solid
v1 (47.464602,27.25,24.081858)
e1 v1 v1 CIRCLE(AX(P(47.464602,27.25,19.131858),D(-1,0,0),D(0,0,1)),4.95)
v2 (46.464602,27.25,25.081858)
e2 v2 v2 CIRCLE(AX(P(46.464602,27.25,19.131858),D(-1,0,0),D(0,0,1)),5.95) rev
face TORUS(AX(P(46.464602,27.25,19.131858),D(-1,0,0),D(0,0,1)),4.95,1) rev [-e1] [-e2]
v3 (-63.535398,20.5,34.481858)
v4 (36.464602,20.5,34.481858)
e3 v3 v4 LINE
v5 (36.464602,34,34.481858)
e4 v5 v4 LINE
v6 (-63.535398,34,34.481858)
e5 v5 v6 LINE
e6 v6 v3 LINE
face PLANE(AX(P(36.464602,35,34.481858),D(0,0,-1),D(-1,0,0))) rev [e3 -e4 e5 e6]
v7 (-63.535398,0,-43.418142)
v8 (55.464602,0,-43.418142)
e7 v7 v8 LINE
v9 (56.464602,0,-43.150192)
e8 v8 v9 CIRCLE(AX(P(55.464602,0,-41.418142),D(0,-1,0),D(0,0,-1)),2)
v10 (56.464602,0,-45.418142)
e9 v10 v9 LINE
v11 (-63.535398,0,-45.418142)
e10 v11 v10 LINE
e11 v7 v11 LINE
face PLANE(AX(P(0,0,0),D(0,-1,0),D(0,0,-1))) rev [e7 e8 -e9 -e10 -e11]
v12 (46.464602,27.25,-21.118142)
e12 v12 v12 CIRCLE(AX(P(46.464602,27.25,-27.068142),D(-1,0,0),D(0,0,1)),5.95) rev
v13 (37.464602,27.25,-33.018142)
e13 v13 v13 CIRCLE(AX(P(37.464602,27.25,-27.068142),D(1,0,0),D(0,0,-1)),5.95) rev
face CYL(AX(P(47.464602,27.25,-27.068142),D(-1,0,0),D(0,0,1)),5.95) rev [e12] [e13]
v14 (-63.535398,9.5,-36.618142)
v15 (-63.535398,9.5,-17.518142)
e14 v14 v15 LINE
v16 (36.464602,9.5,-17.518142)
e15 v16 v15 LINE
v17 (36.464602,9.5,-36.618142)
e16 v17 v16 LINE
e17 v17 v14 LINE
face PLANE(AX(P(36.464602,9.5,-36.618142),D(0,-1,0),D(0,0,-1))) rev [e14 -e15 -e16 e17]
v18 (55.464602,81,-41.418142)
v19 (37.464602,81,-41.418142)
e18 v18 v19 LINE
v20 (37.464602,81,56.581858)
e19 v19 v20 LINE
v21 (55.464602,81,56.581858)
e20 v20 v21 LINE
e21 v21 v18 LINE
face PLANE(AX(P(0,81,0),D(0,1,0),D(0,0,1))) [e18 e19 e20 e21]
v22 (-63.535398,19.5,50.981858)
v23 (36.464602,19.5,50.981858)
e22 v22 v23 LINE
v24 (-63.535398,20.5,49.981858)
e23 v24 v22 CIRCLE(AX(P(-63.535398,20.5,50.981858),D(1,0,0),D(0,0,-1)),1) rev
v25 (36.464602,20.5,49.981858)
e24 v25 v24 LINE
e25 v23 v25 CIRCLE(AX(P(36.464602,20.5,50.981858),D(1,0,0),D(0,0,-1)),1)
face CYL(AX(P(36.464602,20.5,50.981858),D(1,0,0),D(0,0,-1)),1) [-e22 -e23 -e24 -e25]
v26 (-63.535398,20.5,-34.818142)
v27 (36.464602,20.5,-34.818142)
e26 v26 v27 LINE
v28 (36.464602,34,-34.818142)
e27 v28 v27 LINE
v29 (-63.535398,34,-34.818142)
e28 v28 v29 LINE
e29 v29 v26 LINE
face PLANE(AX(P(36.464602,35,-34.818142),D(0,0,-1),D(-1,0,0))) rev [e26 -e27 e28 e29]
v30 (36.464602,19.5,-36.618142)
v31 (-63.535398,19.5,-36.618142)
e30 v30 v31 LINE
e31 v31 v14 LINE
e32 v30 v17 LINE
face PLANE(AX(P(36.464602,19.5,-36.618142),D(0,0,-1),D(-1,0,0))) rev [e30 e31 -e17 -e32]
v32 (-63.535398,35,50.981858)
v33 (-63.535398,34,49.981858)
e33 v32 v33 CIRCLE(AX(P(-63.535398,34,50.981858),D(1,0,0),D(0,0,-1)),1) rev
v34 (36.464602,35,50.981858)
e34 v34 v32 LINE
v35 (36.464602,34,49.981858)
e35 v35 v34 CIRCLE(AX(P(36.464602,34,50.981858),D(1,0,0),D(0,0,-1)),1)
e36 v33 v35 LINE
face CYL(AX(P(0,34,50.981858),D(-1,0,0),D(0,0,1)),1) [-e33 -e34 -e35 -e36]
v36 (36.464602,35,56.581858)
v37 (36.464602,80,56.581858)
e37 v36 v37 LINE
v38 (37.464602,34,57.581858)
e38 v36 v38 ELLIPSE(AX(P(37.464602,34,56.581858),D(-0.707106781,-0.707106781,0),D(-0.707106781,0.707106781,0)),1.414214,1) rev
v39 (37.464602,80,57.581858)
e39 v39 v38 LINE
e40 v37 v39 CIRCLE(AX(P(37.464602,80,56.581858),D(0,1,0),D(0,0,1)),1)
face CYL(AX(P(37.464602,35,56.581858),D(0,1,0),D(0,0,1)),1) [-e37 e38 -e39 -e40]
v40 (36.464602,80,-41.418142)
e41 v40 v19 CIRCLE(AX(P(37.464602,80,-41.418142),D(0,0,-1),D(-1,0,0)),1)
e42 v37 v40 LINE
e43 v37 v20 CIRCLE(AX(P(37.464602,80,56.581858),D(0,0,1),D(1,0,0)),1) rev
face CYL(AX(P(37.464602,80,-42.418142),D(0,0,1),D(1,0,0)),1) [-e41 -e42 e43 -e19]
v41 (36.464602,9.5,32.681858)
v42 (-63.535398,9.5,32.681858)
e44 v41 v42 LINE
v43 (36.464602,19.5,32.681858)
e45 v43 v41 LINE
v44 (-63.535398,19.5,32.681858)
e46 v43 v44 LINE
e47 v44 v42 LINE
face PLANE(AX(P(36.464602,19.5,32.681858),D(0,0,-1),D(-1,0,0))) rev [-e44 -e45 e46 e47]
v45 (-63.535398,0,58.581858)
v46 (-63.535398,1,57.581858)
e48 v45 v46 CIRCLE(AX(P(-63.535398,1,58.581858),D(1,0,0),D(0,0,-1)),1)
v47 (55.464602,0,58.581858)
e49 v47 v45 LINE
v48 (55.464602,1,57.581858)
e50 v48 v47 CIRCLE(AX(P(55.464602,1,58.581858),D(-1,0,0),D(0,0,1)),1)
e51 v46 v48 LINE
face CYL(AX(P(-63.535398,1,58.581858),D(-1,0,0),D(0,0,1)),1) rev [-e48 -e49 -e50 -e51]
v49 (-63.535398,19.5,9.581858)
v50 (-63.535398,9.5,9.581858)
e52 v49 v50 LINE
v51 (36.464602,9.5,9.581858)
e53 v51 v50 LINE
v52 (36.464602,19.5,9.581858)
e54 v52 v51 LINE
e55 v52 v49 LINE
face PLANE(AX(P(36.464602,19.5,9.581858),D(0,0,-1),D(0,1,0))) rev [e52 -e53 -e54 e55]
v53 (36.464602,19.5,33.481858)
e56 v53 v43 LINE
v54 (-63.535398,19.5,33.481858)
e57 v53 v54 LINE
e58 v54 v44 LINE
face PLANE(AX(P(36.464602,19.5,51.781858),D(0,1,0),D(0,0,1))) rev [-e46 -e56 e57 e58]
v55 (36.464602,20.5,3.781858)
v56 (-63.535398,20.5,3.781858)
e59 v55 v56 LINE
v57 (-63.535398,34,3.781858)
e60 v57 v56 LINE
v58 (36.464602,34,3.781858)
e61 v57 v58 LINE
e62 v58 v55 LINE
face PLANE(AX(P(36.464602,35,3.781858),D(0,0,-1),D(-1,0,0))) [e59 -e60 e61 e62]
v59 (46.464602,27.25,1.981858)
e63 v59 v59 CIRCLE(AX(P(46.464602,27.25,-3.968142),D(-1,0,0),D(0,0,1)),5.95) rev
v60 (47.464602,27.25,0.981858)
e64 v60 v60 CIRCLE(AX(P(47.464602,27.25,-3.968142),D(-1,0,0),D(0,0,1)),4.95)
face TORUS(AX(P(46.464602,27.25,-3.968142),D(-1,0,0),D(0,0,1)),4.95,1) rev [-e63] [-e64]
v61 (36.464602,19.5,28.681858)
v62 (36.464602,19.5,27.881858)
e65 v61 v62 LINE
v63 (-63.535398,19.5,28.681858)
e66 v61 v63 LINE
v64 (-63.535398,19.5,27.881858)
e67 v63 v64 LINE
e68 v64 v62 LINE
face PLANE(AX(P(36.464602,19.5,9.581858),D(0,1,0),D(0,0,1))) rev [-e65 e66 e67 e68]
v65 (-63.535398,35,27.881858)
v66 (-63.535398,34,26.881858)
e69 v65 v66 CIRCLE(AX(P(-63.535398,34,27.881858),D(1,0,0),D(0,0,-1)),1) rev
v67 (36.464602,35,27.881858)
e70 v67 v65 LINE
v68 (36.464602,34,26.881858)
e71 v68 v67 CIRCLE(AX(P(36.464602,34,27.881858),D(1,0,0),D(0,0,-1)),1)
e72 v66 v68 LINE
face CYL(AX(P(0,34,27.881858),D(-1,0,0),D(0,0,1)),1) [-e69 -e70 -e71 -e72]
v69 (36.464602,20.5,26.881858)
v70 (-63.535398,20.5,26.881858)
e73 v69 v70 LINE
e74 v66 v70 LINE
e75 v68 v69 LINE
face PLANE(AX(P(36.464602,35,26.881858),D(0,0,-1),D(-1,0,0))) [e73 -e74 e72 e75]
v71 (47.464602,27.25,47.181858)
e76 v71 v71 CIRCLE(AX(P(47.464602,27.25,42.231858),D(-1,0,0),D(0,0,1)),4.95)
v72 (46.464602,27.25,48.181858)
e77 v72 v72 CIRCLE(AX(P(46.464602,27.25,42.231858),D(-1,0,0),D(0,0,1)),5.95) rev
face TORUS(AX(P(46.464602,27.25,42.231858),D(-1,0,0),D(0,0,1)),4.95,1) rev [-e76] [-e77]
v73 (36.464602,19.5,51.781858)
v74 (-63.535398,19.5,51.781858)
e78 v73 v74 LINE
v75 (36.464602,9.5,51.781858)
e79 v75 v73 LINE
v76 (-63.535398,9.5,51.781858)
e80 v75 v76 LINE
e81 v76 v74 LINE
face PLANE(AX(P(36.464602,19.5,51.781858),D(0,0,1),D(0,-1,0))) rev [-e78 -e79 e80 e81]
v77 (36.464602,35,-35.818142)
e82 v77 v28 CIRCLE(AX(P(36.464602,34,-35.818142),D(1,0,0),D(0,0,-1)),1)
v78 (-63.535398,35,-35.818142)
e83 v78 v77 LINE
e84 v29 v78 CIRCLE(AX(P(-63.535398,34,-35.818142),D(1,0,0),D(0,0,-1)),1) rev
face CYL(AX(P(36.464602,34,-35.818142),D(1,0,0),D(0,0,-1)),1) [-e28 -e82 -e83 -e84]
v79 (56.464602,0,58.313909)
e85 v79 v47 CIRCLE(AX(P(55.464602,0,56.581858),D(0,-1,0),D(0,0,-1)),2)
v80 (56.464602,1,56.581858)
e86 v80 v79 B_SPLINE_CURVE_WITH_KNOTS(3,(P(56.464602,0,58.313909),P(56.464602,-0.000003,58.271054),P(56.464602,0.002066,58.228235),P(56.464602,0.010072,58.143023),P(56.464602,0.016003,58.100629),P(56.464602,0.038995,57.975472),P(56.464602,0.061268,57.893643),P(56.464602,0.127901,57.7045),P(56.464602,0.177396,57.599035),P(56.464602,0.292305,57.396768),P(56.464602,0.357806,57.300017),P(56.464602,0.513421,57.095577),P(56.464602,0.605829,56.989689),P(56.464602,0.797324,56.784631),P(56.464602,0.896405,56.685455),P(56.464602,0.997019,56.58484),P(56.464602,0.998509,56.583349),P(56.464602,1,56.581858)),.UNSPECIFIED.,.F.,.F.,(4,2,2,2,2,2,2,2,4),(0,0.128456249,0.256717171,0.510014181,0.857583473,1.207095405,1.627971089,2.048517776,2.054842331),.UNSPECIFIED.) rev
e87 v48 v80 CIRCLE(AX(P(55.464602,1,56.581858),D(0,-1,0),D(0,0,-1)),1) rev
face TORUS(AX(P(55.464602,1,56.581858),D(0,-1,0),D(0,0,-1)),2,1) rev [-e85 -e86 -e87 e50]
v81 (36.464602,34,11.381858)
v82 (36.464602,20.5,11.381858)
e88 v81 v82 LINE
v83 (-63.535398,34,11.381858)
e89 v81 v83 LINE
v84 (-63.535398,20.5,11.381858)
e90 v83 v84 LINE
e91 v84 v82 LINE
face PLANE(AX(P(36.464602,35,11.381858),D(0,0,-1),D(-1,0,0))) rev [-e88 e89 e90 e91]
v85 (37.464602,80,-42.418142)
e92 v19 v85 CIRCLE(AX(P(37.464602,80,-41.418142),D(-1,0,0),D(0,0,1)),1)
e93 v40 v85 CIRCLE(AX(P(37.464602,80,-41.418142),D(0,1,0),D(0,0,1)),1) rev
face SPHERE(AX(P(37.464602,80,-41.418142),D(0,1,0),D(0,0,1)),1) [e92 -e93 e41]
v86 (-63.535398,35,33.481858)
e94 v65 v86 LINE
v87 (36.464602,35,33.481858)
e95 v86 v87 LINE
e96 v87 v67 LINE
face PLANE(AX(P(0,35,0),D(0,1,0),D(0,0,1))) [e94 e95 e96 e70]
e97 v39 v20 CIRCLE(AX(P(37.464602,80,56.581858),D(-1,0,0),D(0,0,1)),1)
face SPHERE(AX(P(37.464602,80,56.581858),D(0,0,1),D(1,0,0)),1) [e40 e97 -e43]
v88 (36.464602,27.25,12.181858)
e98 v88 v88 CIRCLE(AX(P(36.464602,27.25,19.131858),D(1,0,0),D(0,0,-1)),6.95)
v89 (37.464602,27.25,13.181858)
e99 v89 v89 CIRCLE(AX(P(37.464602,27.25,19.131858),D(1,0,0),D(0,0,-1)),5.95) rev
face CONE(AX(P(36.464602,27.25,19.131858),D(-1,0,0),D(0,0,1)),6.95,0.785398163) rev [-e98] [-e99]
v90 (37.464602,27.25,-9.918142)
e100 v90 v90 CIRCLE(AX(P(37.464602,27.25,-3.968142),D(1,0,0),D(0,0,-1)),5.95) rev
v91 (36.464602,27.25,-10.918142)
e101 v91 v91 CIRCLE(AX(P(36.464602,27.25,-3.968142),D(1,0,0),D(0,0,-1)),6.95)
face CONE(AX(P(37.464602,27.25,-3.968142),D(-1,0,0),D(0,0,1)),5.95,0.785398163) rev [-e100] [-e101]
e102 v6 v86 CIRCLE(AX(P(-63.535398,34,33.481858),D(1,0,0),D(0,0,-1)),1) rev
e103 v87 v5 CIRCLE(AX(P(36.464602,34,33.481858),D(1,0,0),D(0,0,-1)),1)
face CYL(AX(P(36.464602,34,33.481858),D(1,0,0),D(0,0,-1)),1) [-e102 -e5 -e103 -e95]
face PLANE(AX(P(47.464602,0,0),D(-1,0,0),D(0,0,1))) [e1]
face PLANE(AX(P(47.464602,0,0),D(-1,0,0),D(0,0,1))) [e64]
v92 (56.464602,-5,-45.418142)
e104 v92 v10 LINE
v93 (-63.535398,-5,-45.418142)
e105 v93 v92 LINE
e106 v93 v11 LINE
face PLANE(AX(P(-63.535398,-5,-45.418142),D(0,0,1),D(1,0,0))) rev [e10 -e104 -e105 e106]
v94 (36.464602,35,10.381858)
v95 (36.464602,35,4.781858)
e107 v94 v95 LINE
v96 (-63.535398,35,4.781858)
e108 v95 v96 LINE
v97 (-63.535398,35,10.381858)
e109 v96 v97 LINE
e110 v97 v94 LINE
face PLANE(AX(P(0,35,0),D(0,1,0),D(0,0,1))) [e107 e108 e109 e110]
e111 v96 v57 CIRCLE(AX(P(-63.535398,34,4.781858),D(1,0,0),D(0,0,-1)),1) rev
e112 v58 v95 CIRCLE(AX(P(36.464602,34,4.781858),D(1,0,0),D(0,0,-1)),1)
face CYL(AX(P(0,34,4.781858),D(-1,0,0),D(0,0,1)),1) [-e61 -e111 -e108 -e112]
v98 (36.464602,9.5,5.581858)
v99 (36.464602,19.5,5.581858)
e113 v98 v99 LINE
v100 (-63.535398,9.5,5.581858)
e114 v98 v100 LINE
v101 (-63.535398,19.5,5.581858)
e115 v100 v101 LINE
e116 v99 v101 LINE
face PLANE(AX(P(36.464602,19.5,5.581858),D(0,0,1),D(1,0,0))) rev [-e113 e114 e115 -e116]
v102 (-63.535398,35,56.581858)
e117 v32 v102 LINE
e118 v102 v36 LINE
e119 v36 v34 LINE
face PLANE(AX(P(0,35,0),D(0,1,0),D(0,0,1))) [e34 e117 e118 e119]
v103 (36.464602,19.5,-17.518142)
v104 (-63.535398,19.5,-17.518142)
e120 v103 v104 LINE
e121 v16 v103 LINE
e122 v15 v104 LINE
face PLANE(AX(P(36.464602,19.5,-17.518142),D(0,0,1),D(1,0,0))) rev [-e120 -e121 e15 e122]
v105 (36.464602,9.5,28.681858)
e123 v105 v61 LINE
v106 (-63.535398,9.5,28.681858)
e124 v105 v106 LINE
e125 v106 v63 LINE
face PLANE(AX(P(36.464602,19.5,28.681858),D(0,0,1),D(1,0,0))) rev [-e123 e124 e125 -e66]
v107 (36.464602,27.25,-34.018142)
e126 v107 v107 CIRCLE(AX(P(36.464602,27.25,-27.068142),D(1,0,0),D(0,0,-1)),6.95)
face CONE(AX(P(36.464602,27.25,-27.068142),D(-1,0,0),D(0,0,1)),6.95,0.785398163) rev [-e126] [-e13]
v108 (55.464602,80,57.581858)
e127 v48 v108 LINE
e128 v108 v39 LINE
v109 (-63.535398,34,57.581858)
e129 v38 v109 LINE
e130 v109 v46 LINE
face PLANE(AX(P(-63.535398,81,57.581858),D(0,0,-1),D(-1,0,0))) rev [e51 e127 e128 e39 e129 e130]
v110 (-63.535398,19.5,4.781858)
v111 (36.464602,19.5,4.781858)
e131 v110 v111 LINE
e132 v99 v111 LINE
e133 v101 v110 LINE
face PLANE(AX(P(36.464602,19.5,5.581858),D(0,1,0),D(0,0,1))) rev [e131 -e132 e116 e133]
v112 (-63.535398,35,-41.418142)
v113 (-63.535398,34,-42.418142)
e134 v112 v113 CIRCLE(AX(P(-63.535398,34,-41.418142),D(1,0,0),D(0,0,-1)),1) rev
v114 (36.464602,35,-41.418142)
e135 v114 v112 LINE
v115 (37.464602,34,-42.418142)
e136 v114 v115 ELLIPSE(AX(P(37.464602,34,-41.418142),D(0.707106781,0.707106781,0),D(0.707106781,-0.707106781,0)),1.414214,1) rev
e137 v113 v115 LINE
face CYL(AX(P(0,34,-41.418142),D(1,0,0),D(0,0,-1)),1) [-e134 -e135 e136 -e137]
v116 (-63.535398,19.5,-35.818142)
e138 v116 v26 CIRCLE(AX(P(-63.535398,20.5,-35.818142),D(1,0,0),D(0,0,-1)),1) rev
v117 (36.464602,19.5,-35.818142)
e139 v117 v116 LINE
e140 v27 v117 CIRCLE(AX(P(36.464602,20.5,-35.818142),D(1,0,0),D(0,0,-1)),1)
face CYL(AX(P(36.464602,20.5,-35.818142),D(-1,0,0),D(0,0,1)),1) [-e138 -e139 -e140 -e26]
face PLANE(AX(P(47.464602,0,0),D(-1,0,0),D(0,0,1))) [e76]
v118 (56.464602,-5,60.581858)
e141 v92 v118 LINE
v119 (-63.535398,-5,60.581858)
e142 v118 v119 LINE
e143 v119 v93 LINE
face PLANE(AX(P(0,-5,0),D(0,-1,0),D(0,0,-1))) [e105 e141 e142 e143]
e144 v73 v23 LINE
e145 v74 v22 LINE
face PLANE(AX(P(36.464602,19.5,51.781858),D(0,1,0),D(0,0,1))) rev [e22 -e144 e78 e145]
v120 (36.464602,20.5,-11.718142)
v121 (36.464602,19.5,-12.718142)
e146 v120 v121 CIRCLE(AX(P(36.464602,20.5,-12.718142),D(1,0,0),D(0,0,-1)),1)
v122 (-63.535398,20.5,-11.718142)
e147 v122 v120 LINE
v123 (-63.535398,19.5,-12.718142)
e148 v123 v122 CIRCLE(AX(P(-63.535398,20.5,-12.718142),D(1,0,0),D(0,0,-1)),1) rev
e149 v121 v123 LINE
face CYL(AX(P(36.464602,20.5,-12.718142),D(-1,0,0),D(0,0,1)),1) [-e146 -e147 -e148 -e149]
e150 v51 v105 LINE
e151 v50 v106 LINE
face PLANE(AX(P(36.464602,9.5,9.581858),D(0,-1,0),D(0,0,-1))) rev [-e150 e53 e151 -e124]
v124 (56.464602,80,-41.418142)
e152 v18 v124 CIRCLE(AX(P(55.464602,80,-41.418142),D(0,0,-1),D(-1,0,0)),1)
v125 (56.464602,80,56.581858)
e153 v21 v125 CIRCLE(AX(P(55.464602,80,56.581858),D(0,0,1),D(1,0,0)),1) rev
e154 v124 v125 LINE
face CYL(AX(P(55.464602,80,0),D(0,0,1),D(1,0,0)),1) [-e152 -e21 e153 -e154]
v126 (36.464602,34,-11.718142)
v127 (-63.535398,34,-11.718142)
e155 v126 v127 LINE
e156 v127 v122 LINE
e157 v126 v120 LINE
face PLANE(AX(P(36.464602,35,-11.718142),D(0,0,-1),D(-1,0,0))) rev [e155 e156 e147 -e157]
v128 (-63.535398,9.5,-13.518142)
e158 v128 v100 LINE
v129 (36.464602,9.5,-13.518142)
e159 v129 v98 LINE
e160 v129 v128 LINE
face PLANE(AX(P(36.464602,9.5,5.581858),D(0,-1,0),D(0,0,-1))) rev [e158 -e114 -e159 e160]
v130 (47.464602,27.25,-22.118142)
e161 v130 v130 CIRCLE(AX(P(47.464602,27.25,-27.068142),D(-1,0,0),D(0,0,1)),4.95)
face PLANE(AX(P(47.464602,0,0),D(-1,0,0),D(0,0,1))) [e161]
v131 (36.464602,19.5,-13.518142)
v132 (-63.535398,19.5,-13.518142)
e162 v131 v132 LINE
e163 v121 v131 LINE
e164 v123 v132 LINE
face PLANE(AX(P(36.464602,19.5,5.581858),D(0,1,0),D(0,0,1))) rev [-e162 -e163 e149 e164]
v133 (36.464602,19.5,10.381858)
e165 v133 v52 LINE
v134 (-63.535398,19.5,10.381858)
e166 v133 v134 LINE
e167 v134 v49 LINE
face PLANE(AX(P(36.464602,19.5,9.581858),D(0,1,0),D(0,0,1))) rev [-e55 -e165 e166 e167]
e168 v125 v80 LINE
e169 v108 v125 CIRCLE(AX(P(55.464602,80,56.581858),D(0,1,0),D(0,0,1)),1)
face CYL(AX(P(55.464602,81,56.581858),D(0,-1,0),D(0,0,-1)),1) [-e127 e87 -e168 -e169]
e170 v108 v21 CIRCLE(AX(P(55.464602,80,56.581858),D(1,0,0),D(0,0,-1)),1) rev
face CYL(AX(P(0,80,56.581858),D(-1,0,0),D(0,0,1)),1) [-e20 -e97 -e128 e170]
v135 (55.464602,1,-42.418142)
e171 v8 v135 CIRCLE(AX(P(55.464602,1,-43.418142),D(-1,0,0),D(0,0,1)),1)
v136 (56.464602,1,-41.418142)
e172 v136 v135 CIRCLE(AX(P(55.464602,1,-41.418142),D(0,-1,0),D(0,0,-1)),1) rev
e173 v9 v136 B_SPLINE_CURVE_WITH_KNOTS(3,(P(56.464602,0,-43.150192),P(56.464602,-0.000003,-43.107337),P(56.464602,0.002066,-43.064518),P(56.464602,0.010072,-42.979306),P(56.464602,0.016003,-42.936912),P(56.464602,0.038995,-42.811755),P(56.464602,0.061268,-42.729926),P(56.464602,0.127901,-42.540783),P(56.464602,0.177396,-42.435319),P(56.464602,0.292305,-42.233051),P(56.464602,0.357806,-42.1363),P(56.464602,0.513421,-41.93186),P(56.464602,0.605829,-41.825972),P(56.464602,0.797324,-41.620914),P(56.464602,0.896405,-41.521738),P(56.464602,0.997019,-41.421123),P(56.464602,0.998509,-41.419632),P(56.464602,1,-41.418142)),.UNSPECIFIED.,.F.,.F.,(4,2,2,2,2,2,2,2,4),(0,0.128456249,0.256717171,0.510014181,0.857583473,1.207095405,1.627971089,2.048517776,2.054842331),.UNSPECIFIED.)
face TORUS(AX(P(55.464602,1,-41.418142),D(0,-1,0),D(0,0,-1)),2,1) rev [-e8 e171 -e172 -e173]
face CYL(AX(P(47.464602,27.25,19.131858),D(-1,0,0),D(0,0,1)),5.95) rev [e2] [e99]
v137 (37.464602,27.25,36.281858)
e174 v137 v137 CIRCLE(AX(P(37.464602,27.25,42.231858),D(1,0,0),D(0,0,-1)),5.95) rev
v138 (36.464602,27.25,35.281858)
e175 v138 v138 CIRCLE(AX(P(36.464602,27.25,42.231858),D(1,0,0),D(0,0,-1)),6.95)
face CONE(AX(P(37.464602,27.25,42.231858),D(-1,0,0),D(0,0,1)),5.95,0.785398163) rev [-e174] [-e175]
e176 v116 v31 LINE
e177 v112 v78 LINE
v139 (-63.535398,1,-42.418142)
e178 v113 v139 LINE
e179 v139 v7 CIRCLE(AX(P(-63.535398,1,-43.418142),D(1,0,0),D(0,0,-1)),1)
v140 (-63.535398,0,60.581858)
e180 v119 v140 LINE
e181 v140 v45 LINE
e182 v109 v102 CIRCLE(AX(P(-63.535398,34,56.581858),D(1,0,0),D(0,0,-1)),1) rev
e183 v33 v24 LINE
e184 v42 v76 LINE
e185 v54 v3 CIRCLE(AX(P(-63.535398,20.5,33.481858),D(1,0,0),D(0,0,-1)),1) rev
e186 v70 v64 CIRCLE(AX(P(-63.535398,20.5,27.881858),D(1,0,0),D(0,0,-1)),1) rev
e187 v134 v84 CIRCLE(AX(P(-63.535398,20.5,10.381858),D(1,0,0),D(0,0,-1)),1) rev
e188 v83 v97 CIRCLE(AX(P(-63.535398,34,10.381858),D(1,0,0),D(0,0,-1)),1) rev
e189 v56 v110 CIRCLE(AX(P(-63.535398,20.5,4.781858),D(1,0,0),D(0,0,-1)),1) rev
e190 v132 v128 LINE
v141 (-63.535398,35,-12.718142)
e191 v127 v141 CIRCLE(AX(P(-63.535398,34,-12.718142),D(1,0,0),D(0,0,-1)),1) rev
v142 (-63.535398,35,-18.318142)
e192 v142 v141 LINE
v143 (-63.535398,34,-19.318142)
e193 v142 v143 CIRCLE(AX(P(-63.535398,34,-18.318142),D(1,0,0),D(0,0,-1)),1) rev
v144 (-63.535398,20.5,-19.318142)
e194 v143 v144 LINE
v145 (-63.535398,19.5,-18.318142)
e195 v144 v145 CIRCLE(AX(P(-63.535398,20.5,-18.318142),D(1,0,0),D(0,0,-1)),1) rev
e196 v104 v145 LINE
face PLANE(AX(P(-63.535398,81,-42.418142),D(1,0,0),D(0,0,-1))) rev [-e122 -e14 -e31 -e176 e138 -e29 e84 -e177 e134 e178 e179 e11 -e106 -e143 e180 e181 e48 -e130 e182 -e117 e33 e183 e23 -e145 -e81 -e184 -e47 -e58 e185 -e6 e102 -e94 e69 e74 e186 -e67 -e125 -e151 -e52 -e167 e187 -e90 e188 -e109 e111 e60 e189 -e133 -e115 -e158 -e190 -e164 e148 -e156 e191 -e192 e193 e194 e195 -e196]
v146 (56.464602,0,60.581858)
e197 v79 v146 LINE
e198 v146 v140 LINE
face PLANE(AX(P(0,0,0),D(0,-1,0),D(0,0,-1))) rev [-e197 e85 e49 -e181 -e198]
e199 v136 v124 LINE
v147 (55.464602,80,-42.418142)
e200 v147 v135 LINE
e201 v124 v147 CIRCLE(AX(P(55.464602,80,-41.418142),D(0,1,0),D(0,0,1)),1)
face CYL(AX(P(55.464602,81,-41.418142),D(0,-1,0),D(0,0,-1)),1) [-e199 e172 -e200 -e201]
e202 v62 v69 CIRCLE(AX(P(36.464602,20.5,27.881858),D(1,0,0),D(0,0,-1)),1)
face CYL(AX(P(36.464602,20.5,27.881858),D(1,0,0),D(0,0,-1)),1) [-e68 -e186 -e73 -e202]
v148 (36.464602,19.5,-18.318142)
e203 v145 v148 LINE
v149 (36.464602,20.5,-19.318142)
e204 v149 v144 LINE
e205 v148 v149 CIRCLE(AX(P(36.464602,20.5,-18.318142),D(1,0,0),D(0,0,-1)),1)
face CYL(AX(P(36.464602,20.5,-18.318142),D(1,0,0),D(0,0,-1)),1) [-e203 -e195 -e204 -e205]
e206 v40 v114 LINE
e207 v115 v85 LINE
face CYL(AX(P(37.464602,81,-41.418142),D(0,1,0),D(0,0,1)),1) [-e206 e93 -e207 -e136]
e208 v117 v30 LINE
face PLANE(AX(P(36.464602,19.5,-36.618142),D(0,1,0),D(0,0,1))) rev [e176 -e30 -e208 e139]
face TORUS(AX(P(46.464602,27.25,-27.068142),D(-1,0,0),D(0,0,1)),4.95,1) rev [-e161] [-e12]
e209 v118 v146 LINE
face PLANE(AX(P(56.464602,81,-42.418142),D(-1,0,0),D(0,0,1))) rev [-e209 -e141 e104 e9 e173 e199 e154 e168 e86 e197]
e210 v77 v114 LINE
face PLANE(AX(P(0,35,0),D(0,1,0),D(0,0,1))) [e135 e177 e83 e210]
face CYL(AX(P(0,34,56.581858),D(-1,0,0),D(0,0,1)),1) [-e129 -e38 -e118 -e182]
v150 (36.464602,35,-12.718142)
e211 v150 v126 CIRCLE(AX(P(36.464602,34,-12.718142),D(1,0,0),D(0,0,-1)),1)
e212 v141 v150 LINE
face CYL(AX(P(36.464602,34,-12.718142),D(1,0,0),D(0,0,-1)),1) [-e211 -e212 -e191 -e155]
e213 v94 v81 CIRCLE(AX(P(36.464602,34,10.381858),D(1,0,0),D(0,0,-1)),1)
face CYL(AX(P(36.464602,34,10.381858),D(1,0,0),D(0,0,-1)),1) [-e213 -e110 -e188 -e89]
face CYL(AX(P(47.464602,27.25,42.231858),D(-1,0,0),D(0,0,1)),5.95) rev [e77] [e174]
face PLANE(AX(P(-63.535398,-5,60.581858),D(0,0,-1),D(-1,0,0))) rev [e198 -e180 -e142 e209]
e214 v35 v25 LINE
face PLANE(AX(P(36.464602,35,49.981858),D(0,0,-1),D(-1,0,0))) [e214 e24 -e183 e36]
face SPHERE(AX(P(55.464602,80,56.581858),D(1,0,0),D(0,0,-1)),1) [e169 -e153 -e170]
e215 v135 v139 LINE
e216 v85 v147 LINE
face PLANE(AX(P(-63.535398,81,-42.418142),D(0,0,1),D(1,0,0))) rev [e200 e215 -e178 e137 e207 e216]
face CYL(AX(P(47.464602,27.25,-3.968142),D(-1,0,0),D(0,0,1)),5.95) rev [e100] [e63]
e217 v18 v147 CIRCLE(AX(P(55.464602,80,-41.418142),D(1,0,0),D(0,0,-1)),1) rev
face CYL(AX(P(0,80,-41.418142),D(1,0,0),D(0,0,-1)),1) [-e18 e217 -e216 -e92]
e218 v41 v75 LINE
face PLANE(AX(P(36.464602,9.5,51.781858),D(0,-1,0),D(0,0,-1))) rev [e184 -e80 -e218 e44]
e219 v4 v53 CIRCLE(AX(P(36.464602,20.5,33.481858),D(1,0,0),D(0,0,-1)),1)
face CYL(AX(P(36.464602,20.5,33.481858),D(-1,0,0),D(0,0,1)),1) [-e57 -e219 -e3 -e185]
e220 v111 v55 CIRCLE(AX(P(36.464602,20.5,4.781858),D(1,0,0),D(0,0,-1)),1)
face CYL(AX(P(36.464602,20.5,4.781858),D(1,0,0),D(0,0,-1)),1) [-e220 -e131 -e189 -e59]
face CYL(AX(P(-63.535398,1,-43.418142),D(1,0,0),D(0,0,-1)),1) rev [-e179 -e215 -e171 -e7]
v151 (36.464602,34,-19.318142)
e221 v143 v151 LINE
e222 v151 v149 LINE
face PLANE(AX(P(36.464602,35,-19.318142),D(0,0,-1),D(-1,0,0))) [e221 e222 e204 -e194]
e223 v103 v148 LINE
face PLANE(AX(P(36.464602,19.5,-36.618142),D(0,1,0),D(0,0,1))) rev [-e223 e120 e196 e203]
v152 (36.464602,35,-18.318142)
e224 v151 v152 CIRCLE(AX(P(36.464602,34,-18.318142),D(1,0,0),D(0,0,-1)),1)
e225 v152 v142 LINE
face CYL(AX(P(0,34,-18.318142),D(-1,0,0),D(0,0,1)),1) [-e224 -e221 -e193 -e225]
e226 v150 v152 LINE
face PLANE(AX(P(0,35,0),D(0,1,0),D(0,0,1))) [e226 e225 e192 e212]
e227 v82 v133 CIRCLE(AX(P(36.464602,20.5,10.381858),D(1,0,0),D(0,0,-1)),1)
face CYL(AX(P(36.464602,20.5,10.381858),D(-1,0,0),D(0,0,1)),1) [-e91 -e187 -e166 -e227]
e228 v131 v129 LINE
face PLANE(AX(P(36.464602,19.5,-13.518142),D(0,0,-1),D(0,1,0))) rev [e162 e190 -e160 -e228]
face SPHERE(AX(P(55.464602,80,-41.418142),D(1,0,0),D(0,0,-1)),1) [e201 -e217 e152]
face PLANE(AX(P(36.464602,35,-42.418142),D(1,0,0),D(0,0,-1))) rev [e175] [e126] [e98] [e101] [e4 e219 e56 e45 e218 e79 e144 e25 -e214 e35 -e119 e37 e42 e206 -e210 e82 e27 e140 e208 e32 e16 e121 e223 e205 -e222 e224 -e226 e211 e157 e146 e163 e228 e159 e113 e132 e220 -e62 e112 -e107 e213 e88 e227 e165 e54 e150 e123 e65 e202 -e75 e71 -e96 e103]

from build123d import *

# Parameters (mm, degrees)
SKETCH1_W           = 120
SKETCH1_H           = 100
BOSS_EXTRUDE1_DEPTH = 81
SKETCH2_W           = 100
SKETCH2_H           = 100
CUT_EXTRUDE1_DEPTH  = 46
SKETCH6_W           = 15.5
SKETCH6_H           = 15.5
CUT_EXTRUDE4_DEPTH  = 100
SKETCH8_W           = 19.1
SKETCH8_H           = 10
CUT_EXTRUDE5_DEPTH  = 100
SKETCH6_3_R         = 5.95
CUT_EXTRUDE6_DEPTH  = 111
FILLET1_R           = 1
CHAMFER1_SIZE       = 1
FILLET2_R           = 1
FILLET3_R           = 1
SKETCH9_W           = 120
SKETCH9_H           = 106
BOSS_EXTRUDE2_DEPTH = 5
FILLET4_R           = 1


with BuildPart() as part:
    # Sketch1 → Boss-Extrude1 (new body)
    with BuildSketch(Plane(origin=(0, 0, 0), x_dir=(1, 0, 0), z_dir=(0, 1, 0))):
        with Locations((-3.53539823, -7.581858407)):
            Rectangle(SKETCH1_W, SKETCH1_H)
    extrude(amount=BOSS_EXTRUDE1_DEPTH)

    # Sketch2 → Cut-Extrude1 (cut)
    with BuildSketch(Plane(origin=(0, 81, 0), x_dir=(1, 0, 0), z_dir=(0, 1, 0))):
        with Locations((-13.53539823, -7.581858407)):
            Rectangle(SKETCH2_W, SKETCH2_H)
    extrude(amount=-CUT_EXTRUDE1_DEPTH, mode=Mode.SUBTRACT)

    # Sketch6 → Cut-Extrude4 (cut)
    with BuildSketch(Plane.ZY.offset(63.53539823)):
        with Locations((-27.068141593, 27.25)):
            Rectangle(SKETCH6_W, SKETCH6_H)
        with Locations((-3.968141593, 27.25)):
            Rectangle(SKETCH6_W, SKETCH6_H)
        with Locations((19.131858407, 27.25)):
            Rectangle(SKETCH6_W, SKETCH6_H)
        with Locations((42.231858407, 27.25)):
            Rectangle(SKETCH6_W, SKETCH6_H)
    extrude(amount=-CUT_EXTRUDE4_DEPTH, mode=Mode.SUBTRACT)

    # Sketch8 → Cut-Extrude5 (cut)
    with BuildSketch(Plane.ZY.offset(63.53539823)):
        with Locations((-27.068141593, 14.5)):
            Rectangle(SKETCH8_W, SKETCH8_H)
        with Locations((-3.968141593, 14.5)):
            Rectangle(SKETCH8_W, SKETCH8_H)
        with Locations((42.231858407, 14.5)):
            Rectangle(SKETCH8_W, SKETCH8_H)
        with Locations((19.131858407, 14.5)):
            Rectangle(SKETCH8_W, SKETCH8_H)
    extrude(amount=-CUT_EXTRUDE5_DEPTH, mode=Mode.SUBTRACT)

    # Sketch6<3> → Cut-Extrude6 (cut)
    with BuildSketch(Plane.ZY.offset(63.53539823)):
        with Locations((-27.068141593, 27.25)):
            Circle(SKETCH6_3_R)
        with Locations((-3.968141593, 27.25)):
            Circle(SKETCH6_3_R)
        with Locations((42.231858407, 27.25)):
            Circle(SKETCH6_3_R)
        with Locations((19.131858407, 27.25)):
            Circle(SKETCH6_3_R)
    extrude(amount=-CUT_EXTRUDE6_DEPTH, mode=Mode.SUBTRACT)

    # Fillet1
    fillet1_edges = [part.edges().sort_by_distance(p)[0] for p in [
        (56.46460177, 81, 7.581858407),
        (46.46460177, 81, 57.581858407),
        (46.46460177, 81, -42.418141593),
        (-13.53539823, 35, -42.418141593),
        (36.46460177, 58, -42.418141593),
        (-13.53539823, 35, 57.581858407),
        (36.46460177, 58, 57.581858407),
        (36.46460177, 81, 7.581858407),
        (56.46460177, 40.5, -42.418141593),
        (56.46460177, 40.5, 57.581858407),
    ]]
    fillet(fillet1_edges, radius=FILLET1_R)

    # Chamfer1
    chamfer1_edges = [part.edges().sort_by_distance(p)[0] for p in [
        (36.46460177, 27.25, -33.018141593),
        (36.46460177, 27.25, -9.918141593),
        (36.46460177, 27.25, 13.181858407),
        (36.46460177, 27.25, 36.281858407),
    ]]
    chamfer(chamfer1_edges, length=CHAMFER1_SIZE)

    # Fillet2
    fillet2_edges = [part.edges().sort_by_distance(p)[0] for p in [
        (47.46460177, 27.25, -33.018141593),
        (47.46460177, 27.25, -9.918141593),
        (47.46460177, 27.25, 13.181858407),
        (47.46460177, 27.25, 36.281858407),
    ]]
    fillet(fillet2_edges, radius=FILLET2_R)

    # Fillet3
    fillet3_edges = [part.edges().sort_by_distance(p)[0] for p in [
        (-13.53539823, 19.5, -19.318141593),
        (-13.53539823, 19.5, -34.818141593),
        (-13.53539823, 35, -34.818141593),
        (-13.53539823, 35, -19.318141593),
        (-13.53539823, 19.5, 3.781858407),
        (-13.53539823, 19.5, -11.718141593),
        (-13.53539823, 35, -11.718141593),
        (-13.53539823, 35, 3.781858407),
        (-13.53539823, 19.5, 49.981858407),
        (-13.53539823, 19.5, 34.481858407),
        (-13.53539823, 35, 34.481858407),
        (-13.53539823, 35, 49.981858407),
        (-13.53539823, 19.5, 26.881858407),
        (-13.53539823, 19.5, 11.381858407),
        (-13.53539823, 35, 11.381858407),
        (-13.53539823, 35, 26.881858407),
    ]]
    fillet(fillet3_edges, radius=FILLET3_R)

    # Sketch9 → Boss-Extrude2 (add)
    with BuildSketch(Plane.XZ):
        with Locations((-3.53539823, 7.581858407)):
            Rectangle(SKETCH9_W, SKETCH9_H)
    extrude(amount=BOSS_EXTRUDE2_DEPTH)

    # Fillet4
    # the kernel refuses this fillet: 1 mm, written as the material it adds along each edge
    with BuildSketch(Plane(origin=(-63.53539823, 0, -42.418141593), x_dir=(0, 0, -1), z_dir=(1, 0, 0)), Plane(origin=(55.46460177, 0, 57.581858407), x_dir=(0, 0, 1), z_dir=(-1, 0, 0))) as fillet4_piece_1:
        with BuildLine():
            CenterArc((FILLET4_R, FILLET4_R), FILLET4_R, 180, 90)
            Line((0, FILLET4_R), (0, 0))
            Line((0, 0), (FILLET4_R, 0))
        make_face()
    extrude(amount=119)
    with BuildSketch(Plane(origin=(55.46460177, 0, -41.418141593), x_dir=(0, 0, -1), z_dir=(-1, 0, 0))) as fillet4_piece_2_section:
        with BuildLine():
            CenterArc((1 + FILLET4_R, -FILLET4_R), FILLET4_R, 90, 90)
            Line((1, -FILLET4_R), (1, 0))
            Line((1, 0), (1 + FILLET4_R, 0))
        make_face()
    fillet4_piece_2 = revolve(axis=Axis((55.46460177, 0, -41.418141593), (0, -1, 0)), revolution_arc=233.296989237, mode=Mode.PRIVATE)
    fillet4_piece_2 = split(fillet4_piece_2, bisect_by=Plane(origin=(56.46460177, 0.167300205, -42.63791684), z_dir=(-1, 0, 0)), keep=Keep.TOP, mode=Mode.PRIVATE)
    add(fillet4_piece_2)
    with BuildSketch(Plane(origin=(55.46460177, 0, 56.581858407), x_dir=(-0.8017442392976468, 0, -0.5976672776328293), z_dir=(-0.5976672776328293, 0, 0.8017442392976468))) as fillet4_piece_3_section:
        with BuildLine():
            CenterArc((1 + FILLET4_R, -FILLET4_R), FILLET4_R, 90, 90)
            Line((1, -FILLET4_R), (1, 0))
            Line((1, 0), (1 + FILLET4_R, 0))
        make_face()
    fillet4_piece_3 = revolve(axis=Axis((55.46460177, 0, 56.581858407), (0, -1, 0)), revolution_arc=233.296989237, mode=Mode.PRIVATE)
    fillet4_piece_3 = split(fillet4_piece_3, bisect_by=Plane(origin=(56.46460177, 0.311628638, 57.331797297), z_dir=(-1, 0, 0)), keep=Keep.TOP, mode=Mode.PRIVATE)
    add(fillet4_piece_3)


solid = part.part
